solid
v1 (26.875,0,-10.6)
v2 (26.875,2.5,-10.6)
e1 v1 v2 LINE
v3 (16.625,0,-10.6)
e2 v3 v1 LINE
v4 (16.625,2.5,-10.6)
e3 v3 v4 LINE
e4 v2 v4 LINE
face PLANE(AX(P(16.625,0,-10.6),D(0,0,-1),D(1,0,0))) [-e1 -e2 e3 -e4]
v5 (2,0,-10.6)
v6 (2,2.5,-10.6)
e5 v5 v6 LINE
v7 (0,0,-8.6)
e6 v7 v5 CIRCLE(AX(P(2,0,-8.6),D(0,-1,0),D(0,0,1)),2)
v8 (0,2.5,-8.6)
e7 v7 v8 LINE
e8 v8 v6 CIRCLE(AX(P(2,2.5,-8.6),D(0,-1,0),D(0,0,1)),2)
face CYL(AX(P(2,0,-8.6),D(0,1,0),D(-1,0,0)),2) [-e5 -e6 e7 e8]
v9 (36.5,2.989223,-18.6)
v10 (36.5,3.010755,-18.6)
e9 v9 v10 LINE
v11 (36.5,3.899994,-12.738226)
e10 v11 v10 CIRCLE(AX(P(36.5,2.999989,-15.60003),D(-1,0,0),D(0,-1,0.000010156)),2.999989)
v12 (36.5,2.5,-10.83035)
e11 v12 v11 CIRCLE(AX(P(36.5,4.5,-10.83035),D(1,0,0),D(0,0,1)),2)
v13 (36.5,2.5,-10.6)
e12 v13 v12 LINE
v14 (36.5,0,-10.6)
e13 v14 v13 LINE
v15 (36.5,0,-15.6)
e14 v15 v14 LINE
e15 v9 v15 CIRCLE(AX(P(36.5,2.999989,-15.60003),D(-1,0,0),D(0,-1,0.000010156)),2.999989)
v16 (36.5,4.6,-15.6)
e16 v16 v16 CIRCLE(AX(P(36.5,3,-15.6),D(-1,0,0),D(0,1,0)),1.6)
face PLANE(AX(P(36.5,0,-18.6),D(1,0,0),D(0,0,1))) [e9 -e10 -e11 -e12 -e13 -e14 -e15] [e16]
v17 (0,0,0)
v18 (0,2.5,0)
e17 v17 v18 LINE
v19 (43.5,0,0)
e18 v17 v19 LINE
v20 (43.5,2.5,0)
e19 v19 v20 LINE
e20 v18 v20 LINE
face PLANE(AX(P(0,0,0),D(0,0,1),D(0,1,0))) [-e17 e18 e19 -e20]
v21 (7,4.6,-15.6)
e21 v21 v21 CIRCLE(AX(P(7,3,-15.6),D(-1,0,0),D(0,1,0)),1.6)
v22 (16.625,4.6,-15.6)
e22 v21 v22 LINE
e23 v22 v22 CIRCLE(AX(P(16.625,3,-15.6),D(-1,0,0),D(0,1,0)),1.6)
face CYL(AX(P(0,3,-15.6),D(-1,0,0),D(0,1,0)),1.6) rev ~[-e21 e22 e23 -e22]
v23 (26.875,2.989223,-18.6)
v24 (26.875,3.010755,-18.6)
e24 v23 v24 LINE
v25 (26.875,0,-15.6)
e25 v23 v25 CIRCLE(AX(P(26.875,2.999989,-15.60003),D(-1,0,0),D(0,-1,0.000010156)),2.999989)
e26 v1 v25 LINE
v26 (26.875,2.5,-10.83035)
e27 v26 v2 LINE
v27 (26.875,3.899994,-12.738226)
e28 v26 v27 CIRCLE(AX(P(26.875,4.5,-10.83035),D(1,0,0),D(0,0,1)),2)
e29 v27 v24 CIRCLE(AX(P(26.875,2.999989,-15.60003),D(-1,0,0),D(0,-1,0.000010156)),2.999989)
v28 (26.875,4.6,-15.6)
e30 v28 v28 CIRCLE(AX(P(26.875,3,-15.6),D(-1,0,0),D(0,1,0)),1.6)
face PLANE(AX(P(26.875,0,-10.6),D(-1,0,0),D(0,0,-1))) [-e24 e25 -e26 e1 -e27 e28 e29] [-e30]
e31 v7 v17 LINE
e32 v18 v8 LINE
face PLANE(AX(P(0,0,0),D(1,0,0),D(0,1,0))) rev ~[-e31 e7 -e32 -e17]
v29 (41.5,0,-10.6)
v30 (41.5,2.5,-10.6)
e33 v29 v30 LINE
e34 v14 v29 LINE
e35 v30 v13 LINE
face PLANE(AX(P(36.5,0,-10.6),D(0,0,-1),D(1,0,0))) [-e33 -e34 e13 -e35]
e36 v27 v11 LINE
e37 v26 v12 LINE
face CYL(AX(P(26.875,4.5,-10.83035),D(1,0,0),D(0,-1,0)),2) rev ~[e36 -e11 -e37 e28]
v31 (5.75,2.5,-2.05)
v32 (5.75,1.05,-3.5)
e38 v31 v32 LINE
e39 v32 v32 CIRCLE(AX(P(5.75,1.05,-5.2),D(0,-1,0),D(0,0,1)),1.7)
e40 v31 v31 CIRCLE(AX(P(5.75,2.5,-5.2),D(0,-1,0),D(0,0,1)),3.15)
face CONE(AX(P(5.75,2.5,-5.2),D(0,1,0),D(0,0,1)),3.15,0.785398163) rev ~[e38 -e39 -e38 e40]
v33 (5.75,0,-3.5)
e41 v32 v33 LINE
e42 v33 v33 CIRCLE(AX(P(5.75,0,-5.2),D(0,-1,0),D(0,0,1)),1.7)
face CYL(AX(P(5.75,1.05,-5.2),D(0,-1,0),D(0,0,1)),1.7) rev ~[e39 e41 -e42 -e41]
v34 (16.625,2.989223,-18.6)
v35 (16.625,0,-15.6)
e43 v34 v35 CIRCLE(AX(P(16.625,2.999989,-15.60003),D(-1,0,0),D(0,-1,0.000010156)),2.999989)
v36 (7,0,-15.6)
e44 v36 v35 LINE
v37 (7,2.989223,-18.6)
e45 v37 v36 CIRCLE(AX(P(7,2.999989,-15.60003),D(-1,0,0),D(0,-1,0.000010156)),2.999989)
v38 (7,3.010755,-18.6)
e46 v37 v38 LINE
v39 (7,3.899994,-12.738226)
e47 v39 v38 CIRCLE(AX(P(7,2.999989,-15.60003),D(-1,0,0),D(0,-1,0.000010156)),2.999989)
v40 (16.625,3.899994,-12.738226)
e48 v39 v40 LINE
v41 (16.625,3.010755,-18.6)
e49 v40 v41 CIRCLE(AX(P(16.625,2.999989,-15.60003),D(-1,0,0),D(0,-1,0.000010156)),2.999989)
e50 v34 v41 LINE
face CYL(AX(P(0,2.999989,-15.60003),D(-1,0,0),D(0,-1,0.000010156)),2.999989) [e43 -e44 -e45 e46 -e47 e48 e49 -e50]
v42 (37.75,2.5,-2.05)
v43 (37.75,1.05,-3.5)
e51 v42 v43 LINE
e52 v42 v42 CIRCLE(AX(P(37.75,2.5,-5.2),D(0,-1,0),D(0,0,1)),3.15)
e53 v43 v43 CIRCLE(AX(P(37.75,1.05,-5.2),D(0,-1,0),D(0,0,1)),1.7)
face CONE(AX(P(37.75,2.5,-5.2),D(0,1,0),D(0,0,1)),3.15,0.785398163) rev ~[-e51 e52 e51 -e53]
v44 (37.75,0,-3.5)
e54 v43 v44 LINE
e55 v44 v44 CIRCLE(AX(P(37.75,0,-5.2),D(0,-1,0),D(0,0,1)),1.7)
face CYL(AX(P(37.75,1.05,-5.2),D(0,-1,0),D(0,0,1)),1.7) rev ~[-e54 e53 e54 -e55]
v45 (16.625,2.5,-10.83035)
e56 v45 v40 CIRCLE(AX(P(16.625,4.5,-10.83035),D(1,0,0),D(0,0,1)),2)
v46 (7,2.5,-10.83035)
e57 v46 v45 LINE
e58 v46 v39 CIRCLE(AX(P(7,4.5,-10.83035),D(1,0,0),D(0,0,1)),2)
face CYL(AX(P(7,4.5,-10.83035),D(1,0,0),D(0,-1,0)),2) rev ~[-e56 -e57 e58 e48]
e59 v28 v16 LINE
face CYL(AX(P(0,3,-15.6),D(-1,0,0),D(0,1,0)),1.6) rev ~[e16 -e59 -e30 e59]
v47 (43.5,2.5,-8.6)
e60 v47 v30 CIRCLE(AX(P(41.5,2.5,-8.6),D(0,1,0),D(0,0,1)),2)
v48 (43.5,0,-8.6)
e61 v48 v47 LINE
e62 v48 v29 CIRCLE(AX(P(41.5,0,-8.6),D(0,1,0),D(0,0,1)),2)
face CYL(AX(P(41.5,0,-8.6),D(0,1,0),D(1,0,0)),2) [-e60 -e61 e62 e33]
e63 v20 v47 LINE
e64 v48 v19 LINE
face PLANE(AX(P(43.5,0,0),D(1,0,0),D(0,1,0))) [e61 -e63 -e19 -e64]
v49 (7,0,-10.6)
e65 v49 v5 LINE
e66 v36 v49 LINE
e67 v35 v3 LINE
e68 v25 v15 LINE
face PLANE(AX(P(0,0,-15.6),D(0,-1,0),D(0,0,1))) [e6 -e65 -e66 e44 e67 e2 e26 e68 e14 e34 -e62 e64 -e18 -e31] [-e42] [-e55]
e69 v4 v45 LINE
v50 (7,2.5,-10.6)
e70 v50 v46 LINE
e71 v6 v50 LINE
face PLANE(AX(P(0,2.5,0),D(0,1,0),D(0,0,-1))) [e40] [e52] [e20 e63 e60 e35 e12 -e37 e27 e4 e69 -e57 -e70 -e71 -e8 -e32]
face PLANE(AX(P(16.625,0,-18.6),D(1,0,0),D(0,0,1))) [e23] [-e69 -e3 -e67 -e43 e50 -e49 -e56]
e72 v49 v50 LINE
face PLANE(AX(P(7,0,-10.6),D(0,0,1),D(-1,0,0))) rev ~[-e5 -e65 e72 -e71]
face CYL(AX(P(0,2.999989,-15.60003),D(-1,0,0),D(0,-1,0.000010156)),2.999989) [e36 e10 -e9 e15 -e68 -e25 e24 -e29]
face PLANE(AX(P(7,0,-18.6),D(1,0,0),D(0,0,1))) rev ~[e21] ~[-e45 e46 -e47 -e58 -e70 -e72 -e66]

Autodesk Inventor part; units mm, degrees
ref_plane "YZ Plane" through (0, 0, 0) normal (1, 0, 0) x (0, 1, 0)
ref_plane "XZ Plane" through (0, 0, 0) normal (0, 1, 0) x (-1, 0, 0)
ref_plane "XY Plane" through (0, 0, 0) normal (0, 0, 1) x (1, 0, 0)
sketch "Sketch1" plane through (0, 0, 0) normal (1, 0, 0) x (0, 1, 0)
  line L0 (0, 0) -> (2.5, 0)
  line L1 (2.5, 0) -> (2.5, -12.642)
  line L2 (0, -15.6) -> (0, 0)
  arc A0 (0, -15.6) -> (2.5, -12.642) centre (3, -15.6) ccw
  circle A1 centre (3, -15.6) radius 1.6
  point P0 (2.5, -5.2)
  dimension "d0" = 3
  dimension "d1" = 3.2
  dimension "d2" = 2.5
  dimension "d3" = 5.2
  dimension "d4" = 10.4
  dimension "d5" = 3
extrude "Extrusion1" add sketch "Sketch1" along normal blind 43.5
sketch "Sketch2" plane through (0, 0, -15.6) normal (0, -1, 0) x (1, 0, 0)
  line L0 (0, -3) -> (43.5, -3) projected
  line L1 (26.875, -3) -> (16.625, -3)
  line L2 (16.625, -3) -> (16.625, 5)
  line L3 (16.625, 5) -> (26.875, 5)
  line L4 (26.875, 5) -> (26.875, -3)
  line L5 (43.5, -3) -> (43.5, 3) projected
  line L6 (43.5, -3) -> (36.5, -3)
  line L7 (36.5, -3) -> (36.5, 5)
  line L8 (36.5, 5) -> (43.5, 5)
  line L9 (43.5, 5) -> (43.5, -3)
  line L10 (0, -3) -> (7, -3)
  line L11 (7, -3) -> (7, 5)
  line L12 (7, 5) -> (0, 5)
  line L13 (0, 5) -> (0, -3)
  line L14 (43.5, 15.6) -> (43.5, 0) projected
  point P0 (0, 15.6)
  point P1 (43.5, 2.958)
  dimension "d8" = 10.25
  dimension "d9" = 43.5
  dimension "d10" = 16.625
  dimension "d11" = 8
  dimension "d12" = 7
  dimension "d13" = 7
extrude "Extrusion2" cut sketch "Sketch2" against normal through all
sketch "Sketch3" plane through (0, 2.5, 0) normal (0, 1, 0) x (1, 0, 0)
  line L0 (0, 5.2) -> (43.5, 5.2) construction
  line L1 (43.5, 10.6) -> (43.5, 0) construction
  point P0 (0, 0)
  point P1 (5.75, 5.2)
  point P2 (37.75, 5.2)
  dimension "d16" = 32
  dimension "d17" = 43.5
  dimension "d18" = 5.75
hole "Hole1" at (5.75, 2.5, -5.2) at (37.75, 2.5, -5.2) direction (0, -1, 0) diameter 3.4 depth 2.5 countersink diameter 6.3 countersink angle 90 clearance for "Flat Head Machine Screw" size "M3" standard "Ansi Metric M Profile"
fillet "Fillet1" radius 2 4 edges at (0, 1.25, -10.6) (43.5, 1.25, -10.6) (11.8125, 2.5, -12.642) (31.6875, 2.5, -12.642)
equation "\"d5\" = d0"
equation "\"d10\" = -0.5 * d8 + 0.5 * d9"
equation "\"d13\" = d12"
equation "\"d18\" = -0.5 * d16 + 0.5 * d17"
properties part number "hinge_v1"
